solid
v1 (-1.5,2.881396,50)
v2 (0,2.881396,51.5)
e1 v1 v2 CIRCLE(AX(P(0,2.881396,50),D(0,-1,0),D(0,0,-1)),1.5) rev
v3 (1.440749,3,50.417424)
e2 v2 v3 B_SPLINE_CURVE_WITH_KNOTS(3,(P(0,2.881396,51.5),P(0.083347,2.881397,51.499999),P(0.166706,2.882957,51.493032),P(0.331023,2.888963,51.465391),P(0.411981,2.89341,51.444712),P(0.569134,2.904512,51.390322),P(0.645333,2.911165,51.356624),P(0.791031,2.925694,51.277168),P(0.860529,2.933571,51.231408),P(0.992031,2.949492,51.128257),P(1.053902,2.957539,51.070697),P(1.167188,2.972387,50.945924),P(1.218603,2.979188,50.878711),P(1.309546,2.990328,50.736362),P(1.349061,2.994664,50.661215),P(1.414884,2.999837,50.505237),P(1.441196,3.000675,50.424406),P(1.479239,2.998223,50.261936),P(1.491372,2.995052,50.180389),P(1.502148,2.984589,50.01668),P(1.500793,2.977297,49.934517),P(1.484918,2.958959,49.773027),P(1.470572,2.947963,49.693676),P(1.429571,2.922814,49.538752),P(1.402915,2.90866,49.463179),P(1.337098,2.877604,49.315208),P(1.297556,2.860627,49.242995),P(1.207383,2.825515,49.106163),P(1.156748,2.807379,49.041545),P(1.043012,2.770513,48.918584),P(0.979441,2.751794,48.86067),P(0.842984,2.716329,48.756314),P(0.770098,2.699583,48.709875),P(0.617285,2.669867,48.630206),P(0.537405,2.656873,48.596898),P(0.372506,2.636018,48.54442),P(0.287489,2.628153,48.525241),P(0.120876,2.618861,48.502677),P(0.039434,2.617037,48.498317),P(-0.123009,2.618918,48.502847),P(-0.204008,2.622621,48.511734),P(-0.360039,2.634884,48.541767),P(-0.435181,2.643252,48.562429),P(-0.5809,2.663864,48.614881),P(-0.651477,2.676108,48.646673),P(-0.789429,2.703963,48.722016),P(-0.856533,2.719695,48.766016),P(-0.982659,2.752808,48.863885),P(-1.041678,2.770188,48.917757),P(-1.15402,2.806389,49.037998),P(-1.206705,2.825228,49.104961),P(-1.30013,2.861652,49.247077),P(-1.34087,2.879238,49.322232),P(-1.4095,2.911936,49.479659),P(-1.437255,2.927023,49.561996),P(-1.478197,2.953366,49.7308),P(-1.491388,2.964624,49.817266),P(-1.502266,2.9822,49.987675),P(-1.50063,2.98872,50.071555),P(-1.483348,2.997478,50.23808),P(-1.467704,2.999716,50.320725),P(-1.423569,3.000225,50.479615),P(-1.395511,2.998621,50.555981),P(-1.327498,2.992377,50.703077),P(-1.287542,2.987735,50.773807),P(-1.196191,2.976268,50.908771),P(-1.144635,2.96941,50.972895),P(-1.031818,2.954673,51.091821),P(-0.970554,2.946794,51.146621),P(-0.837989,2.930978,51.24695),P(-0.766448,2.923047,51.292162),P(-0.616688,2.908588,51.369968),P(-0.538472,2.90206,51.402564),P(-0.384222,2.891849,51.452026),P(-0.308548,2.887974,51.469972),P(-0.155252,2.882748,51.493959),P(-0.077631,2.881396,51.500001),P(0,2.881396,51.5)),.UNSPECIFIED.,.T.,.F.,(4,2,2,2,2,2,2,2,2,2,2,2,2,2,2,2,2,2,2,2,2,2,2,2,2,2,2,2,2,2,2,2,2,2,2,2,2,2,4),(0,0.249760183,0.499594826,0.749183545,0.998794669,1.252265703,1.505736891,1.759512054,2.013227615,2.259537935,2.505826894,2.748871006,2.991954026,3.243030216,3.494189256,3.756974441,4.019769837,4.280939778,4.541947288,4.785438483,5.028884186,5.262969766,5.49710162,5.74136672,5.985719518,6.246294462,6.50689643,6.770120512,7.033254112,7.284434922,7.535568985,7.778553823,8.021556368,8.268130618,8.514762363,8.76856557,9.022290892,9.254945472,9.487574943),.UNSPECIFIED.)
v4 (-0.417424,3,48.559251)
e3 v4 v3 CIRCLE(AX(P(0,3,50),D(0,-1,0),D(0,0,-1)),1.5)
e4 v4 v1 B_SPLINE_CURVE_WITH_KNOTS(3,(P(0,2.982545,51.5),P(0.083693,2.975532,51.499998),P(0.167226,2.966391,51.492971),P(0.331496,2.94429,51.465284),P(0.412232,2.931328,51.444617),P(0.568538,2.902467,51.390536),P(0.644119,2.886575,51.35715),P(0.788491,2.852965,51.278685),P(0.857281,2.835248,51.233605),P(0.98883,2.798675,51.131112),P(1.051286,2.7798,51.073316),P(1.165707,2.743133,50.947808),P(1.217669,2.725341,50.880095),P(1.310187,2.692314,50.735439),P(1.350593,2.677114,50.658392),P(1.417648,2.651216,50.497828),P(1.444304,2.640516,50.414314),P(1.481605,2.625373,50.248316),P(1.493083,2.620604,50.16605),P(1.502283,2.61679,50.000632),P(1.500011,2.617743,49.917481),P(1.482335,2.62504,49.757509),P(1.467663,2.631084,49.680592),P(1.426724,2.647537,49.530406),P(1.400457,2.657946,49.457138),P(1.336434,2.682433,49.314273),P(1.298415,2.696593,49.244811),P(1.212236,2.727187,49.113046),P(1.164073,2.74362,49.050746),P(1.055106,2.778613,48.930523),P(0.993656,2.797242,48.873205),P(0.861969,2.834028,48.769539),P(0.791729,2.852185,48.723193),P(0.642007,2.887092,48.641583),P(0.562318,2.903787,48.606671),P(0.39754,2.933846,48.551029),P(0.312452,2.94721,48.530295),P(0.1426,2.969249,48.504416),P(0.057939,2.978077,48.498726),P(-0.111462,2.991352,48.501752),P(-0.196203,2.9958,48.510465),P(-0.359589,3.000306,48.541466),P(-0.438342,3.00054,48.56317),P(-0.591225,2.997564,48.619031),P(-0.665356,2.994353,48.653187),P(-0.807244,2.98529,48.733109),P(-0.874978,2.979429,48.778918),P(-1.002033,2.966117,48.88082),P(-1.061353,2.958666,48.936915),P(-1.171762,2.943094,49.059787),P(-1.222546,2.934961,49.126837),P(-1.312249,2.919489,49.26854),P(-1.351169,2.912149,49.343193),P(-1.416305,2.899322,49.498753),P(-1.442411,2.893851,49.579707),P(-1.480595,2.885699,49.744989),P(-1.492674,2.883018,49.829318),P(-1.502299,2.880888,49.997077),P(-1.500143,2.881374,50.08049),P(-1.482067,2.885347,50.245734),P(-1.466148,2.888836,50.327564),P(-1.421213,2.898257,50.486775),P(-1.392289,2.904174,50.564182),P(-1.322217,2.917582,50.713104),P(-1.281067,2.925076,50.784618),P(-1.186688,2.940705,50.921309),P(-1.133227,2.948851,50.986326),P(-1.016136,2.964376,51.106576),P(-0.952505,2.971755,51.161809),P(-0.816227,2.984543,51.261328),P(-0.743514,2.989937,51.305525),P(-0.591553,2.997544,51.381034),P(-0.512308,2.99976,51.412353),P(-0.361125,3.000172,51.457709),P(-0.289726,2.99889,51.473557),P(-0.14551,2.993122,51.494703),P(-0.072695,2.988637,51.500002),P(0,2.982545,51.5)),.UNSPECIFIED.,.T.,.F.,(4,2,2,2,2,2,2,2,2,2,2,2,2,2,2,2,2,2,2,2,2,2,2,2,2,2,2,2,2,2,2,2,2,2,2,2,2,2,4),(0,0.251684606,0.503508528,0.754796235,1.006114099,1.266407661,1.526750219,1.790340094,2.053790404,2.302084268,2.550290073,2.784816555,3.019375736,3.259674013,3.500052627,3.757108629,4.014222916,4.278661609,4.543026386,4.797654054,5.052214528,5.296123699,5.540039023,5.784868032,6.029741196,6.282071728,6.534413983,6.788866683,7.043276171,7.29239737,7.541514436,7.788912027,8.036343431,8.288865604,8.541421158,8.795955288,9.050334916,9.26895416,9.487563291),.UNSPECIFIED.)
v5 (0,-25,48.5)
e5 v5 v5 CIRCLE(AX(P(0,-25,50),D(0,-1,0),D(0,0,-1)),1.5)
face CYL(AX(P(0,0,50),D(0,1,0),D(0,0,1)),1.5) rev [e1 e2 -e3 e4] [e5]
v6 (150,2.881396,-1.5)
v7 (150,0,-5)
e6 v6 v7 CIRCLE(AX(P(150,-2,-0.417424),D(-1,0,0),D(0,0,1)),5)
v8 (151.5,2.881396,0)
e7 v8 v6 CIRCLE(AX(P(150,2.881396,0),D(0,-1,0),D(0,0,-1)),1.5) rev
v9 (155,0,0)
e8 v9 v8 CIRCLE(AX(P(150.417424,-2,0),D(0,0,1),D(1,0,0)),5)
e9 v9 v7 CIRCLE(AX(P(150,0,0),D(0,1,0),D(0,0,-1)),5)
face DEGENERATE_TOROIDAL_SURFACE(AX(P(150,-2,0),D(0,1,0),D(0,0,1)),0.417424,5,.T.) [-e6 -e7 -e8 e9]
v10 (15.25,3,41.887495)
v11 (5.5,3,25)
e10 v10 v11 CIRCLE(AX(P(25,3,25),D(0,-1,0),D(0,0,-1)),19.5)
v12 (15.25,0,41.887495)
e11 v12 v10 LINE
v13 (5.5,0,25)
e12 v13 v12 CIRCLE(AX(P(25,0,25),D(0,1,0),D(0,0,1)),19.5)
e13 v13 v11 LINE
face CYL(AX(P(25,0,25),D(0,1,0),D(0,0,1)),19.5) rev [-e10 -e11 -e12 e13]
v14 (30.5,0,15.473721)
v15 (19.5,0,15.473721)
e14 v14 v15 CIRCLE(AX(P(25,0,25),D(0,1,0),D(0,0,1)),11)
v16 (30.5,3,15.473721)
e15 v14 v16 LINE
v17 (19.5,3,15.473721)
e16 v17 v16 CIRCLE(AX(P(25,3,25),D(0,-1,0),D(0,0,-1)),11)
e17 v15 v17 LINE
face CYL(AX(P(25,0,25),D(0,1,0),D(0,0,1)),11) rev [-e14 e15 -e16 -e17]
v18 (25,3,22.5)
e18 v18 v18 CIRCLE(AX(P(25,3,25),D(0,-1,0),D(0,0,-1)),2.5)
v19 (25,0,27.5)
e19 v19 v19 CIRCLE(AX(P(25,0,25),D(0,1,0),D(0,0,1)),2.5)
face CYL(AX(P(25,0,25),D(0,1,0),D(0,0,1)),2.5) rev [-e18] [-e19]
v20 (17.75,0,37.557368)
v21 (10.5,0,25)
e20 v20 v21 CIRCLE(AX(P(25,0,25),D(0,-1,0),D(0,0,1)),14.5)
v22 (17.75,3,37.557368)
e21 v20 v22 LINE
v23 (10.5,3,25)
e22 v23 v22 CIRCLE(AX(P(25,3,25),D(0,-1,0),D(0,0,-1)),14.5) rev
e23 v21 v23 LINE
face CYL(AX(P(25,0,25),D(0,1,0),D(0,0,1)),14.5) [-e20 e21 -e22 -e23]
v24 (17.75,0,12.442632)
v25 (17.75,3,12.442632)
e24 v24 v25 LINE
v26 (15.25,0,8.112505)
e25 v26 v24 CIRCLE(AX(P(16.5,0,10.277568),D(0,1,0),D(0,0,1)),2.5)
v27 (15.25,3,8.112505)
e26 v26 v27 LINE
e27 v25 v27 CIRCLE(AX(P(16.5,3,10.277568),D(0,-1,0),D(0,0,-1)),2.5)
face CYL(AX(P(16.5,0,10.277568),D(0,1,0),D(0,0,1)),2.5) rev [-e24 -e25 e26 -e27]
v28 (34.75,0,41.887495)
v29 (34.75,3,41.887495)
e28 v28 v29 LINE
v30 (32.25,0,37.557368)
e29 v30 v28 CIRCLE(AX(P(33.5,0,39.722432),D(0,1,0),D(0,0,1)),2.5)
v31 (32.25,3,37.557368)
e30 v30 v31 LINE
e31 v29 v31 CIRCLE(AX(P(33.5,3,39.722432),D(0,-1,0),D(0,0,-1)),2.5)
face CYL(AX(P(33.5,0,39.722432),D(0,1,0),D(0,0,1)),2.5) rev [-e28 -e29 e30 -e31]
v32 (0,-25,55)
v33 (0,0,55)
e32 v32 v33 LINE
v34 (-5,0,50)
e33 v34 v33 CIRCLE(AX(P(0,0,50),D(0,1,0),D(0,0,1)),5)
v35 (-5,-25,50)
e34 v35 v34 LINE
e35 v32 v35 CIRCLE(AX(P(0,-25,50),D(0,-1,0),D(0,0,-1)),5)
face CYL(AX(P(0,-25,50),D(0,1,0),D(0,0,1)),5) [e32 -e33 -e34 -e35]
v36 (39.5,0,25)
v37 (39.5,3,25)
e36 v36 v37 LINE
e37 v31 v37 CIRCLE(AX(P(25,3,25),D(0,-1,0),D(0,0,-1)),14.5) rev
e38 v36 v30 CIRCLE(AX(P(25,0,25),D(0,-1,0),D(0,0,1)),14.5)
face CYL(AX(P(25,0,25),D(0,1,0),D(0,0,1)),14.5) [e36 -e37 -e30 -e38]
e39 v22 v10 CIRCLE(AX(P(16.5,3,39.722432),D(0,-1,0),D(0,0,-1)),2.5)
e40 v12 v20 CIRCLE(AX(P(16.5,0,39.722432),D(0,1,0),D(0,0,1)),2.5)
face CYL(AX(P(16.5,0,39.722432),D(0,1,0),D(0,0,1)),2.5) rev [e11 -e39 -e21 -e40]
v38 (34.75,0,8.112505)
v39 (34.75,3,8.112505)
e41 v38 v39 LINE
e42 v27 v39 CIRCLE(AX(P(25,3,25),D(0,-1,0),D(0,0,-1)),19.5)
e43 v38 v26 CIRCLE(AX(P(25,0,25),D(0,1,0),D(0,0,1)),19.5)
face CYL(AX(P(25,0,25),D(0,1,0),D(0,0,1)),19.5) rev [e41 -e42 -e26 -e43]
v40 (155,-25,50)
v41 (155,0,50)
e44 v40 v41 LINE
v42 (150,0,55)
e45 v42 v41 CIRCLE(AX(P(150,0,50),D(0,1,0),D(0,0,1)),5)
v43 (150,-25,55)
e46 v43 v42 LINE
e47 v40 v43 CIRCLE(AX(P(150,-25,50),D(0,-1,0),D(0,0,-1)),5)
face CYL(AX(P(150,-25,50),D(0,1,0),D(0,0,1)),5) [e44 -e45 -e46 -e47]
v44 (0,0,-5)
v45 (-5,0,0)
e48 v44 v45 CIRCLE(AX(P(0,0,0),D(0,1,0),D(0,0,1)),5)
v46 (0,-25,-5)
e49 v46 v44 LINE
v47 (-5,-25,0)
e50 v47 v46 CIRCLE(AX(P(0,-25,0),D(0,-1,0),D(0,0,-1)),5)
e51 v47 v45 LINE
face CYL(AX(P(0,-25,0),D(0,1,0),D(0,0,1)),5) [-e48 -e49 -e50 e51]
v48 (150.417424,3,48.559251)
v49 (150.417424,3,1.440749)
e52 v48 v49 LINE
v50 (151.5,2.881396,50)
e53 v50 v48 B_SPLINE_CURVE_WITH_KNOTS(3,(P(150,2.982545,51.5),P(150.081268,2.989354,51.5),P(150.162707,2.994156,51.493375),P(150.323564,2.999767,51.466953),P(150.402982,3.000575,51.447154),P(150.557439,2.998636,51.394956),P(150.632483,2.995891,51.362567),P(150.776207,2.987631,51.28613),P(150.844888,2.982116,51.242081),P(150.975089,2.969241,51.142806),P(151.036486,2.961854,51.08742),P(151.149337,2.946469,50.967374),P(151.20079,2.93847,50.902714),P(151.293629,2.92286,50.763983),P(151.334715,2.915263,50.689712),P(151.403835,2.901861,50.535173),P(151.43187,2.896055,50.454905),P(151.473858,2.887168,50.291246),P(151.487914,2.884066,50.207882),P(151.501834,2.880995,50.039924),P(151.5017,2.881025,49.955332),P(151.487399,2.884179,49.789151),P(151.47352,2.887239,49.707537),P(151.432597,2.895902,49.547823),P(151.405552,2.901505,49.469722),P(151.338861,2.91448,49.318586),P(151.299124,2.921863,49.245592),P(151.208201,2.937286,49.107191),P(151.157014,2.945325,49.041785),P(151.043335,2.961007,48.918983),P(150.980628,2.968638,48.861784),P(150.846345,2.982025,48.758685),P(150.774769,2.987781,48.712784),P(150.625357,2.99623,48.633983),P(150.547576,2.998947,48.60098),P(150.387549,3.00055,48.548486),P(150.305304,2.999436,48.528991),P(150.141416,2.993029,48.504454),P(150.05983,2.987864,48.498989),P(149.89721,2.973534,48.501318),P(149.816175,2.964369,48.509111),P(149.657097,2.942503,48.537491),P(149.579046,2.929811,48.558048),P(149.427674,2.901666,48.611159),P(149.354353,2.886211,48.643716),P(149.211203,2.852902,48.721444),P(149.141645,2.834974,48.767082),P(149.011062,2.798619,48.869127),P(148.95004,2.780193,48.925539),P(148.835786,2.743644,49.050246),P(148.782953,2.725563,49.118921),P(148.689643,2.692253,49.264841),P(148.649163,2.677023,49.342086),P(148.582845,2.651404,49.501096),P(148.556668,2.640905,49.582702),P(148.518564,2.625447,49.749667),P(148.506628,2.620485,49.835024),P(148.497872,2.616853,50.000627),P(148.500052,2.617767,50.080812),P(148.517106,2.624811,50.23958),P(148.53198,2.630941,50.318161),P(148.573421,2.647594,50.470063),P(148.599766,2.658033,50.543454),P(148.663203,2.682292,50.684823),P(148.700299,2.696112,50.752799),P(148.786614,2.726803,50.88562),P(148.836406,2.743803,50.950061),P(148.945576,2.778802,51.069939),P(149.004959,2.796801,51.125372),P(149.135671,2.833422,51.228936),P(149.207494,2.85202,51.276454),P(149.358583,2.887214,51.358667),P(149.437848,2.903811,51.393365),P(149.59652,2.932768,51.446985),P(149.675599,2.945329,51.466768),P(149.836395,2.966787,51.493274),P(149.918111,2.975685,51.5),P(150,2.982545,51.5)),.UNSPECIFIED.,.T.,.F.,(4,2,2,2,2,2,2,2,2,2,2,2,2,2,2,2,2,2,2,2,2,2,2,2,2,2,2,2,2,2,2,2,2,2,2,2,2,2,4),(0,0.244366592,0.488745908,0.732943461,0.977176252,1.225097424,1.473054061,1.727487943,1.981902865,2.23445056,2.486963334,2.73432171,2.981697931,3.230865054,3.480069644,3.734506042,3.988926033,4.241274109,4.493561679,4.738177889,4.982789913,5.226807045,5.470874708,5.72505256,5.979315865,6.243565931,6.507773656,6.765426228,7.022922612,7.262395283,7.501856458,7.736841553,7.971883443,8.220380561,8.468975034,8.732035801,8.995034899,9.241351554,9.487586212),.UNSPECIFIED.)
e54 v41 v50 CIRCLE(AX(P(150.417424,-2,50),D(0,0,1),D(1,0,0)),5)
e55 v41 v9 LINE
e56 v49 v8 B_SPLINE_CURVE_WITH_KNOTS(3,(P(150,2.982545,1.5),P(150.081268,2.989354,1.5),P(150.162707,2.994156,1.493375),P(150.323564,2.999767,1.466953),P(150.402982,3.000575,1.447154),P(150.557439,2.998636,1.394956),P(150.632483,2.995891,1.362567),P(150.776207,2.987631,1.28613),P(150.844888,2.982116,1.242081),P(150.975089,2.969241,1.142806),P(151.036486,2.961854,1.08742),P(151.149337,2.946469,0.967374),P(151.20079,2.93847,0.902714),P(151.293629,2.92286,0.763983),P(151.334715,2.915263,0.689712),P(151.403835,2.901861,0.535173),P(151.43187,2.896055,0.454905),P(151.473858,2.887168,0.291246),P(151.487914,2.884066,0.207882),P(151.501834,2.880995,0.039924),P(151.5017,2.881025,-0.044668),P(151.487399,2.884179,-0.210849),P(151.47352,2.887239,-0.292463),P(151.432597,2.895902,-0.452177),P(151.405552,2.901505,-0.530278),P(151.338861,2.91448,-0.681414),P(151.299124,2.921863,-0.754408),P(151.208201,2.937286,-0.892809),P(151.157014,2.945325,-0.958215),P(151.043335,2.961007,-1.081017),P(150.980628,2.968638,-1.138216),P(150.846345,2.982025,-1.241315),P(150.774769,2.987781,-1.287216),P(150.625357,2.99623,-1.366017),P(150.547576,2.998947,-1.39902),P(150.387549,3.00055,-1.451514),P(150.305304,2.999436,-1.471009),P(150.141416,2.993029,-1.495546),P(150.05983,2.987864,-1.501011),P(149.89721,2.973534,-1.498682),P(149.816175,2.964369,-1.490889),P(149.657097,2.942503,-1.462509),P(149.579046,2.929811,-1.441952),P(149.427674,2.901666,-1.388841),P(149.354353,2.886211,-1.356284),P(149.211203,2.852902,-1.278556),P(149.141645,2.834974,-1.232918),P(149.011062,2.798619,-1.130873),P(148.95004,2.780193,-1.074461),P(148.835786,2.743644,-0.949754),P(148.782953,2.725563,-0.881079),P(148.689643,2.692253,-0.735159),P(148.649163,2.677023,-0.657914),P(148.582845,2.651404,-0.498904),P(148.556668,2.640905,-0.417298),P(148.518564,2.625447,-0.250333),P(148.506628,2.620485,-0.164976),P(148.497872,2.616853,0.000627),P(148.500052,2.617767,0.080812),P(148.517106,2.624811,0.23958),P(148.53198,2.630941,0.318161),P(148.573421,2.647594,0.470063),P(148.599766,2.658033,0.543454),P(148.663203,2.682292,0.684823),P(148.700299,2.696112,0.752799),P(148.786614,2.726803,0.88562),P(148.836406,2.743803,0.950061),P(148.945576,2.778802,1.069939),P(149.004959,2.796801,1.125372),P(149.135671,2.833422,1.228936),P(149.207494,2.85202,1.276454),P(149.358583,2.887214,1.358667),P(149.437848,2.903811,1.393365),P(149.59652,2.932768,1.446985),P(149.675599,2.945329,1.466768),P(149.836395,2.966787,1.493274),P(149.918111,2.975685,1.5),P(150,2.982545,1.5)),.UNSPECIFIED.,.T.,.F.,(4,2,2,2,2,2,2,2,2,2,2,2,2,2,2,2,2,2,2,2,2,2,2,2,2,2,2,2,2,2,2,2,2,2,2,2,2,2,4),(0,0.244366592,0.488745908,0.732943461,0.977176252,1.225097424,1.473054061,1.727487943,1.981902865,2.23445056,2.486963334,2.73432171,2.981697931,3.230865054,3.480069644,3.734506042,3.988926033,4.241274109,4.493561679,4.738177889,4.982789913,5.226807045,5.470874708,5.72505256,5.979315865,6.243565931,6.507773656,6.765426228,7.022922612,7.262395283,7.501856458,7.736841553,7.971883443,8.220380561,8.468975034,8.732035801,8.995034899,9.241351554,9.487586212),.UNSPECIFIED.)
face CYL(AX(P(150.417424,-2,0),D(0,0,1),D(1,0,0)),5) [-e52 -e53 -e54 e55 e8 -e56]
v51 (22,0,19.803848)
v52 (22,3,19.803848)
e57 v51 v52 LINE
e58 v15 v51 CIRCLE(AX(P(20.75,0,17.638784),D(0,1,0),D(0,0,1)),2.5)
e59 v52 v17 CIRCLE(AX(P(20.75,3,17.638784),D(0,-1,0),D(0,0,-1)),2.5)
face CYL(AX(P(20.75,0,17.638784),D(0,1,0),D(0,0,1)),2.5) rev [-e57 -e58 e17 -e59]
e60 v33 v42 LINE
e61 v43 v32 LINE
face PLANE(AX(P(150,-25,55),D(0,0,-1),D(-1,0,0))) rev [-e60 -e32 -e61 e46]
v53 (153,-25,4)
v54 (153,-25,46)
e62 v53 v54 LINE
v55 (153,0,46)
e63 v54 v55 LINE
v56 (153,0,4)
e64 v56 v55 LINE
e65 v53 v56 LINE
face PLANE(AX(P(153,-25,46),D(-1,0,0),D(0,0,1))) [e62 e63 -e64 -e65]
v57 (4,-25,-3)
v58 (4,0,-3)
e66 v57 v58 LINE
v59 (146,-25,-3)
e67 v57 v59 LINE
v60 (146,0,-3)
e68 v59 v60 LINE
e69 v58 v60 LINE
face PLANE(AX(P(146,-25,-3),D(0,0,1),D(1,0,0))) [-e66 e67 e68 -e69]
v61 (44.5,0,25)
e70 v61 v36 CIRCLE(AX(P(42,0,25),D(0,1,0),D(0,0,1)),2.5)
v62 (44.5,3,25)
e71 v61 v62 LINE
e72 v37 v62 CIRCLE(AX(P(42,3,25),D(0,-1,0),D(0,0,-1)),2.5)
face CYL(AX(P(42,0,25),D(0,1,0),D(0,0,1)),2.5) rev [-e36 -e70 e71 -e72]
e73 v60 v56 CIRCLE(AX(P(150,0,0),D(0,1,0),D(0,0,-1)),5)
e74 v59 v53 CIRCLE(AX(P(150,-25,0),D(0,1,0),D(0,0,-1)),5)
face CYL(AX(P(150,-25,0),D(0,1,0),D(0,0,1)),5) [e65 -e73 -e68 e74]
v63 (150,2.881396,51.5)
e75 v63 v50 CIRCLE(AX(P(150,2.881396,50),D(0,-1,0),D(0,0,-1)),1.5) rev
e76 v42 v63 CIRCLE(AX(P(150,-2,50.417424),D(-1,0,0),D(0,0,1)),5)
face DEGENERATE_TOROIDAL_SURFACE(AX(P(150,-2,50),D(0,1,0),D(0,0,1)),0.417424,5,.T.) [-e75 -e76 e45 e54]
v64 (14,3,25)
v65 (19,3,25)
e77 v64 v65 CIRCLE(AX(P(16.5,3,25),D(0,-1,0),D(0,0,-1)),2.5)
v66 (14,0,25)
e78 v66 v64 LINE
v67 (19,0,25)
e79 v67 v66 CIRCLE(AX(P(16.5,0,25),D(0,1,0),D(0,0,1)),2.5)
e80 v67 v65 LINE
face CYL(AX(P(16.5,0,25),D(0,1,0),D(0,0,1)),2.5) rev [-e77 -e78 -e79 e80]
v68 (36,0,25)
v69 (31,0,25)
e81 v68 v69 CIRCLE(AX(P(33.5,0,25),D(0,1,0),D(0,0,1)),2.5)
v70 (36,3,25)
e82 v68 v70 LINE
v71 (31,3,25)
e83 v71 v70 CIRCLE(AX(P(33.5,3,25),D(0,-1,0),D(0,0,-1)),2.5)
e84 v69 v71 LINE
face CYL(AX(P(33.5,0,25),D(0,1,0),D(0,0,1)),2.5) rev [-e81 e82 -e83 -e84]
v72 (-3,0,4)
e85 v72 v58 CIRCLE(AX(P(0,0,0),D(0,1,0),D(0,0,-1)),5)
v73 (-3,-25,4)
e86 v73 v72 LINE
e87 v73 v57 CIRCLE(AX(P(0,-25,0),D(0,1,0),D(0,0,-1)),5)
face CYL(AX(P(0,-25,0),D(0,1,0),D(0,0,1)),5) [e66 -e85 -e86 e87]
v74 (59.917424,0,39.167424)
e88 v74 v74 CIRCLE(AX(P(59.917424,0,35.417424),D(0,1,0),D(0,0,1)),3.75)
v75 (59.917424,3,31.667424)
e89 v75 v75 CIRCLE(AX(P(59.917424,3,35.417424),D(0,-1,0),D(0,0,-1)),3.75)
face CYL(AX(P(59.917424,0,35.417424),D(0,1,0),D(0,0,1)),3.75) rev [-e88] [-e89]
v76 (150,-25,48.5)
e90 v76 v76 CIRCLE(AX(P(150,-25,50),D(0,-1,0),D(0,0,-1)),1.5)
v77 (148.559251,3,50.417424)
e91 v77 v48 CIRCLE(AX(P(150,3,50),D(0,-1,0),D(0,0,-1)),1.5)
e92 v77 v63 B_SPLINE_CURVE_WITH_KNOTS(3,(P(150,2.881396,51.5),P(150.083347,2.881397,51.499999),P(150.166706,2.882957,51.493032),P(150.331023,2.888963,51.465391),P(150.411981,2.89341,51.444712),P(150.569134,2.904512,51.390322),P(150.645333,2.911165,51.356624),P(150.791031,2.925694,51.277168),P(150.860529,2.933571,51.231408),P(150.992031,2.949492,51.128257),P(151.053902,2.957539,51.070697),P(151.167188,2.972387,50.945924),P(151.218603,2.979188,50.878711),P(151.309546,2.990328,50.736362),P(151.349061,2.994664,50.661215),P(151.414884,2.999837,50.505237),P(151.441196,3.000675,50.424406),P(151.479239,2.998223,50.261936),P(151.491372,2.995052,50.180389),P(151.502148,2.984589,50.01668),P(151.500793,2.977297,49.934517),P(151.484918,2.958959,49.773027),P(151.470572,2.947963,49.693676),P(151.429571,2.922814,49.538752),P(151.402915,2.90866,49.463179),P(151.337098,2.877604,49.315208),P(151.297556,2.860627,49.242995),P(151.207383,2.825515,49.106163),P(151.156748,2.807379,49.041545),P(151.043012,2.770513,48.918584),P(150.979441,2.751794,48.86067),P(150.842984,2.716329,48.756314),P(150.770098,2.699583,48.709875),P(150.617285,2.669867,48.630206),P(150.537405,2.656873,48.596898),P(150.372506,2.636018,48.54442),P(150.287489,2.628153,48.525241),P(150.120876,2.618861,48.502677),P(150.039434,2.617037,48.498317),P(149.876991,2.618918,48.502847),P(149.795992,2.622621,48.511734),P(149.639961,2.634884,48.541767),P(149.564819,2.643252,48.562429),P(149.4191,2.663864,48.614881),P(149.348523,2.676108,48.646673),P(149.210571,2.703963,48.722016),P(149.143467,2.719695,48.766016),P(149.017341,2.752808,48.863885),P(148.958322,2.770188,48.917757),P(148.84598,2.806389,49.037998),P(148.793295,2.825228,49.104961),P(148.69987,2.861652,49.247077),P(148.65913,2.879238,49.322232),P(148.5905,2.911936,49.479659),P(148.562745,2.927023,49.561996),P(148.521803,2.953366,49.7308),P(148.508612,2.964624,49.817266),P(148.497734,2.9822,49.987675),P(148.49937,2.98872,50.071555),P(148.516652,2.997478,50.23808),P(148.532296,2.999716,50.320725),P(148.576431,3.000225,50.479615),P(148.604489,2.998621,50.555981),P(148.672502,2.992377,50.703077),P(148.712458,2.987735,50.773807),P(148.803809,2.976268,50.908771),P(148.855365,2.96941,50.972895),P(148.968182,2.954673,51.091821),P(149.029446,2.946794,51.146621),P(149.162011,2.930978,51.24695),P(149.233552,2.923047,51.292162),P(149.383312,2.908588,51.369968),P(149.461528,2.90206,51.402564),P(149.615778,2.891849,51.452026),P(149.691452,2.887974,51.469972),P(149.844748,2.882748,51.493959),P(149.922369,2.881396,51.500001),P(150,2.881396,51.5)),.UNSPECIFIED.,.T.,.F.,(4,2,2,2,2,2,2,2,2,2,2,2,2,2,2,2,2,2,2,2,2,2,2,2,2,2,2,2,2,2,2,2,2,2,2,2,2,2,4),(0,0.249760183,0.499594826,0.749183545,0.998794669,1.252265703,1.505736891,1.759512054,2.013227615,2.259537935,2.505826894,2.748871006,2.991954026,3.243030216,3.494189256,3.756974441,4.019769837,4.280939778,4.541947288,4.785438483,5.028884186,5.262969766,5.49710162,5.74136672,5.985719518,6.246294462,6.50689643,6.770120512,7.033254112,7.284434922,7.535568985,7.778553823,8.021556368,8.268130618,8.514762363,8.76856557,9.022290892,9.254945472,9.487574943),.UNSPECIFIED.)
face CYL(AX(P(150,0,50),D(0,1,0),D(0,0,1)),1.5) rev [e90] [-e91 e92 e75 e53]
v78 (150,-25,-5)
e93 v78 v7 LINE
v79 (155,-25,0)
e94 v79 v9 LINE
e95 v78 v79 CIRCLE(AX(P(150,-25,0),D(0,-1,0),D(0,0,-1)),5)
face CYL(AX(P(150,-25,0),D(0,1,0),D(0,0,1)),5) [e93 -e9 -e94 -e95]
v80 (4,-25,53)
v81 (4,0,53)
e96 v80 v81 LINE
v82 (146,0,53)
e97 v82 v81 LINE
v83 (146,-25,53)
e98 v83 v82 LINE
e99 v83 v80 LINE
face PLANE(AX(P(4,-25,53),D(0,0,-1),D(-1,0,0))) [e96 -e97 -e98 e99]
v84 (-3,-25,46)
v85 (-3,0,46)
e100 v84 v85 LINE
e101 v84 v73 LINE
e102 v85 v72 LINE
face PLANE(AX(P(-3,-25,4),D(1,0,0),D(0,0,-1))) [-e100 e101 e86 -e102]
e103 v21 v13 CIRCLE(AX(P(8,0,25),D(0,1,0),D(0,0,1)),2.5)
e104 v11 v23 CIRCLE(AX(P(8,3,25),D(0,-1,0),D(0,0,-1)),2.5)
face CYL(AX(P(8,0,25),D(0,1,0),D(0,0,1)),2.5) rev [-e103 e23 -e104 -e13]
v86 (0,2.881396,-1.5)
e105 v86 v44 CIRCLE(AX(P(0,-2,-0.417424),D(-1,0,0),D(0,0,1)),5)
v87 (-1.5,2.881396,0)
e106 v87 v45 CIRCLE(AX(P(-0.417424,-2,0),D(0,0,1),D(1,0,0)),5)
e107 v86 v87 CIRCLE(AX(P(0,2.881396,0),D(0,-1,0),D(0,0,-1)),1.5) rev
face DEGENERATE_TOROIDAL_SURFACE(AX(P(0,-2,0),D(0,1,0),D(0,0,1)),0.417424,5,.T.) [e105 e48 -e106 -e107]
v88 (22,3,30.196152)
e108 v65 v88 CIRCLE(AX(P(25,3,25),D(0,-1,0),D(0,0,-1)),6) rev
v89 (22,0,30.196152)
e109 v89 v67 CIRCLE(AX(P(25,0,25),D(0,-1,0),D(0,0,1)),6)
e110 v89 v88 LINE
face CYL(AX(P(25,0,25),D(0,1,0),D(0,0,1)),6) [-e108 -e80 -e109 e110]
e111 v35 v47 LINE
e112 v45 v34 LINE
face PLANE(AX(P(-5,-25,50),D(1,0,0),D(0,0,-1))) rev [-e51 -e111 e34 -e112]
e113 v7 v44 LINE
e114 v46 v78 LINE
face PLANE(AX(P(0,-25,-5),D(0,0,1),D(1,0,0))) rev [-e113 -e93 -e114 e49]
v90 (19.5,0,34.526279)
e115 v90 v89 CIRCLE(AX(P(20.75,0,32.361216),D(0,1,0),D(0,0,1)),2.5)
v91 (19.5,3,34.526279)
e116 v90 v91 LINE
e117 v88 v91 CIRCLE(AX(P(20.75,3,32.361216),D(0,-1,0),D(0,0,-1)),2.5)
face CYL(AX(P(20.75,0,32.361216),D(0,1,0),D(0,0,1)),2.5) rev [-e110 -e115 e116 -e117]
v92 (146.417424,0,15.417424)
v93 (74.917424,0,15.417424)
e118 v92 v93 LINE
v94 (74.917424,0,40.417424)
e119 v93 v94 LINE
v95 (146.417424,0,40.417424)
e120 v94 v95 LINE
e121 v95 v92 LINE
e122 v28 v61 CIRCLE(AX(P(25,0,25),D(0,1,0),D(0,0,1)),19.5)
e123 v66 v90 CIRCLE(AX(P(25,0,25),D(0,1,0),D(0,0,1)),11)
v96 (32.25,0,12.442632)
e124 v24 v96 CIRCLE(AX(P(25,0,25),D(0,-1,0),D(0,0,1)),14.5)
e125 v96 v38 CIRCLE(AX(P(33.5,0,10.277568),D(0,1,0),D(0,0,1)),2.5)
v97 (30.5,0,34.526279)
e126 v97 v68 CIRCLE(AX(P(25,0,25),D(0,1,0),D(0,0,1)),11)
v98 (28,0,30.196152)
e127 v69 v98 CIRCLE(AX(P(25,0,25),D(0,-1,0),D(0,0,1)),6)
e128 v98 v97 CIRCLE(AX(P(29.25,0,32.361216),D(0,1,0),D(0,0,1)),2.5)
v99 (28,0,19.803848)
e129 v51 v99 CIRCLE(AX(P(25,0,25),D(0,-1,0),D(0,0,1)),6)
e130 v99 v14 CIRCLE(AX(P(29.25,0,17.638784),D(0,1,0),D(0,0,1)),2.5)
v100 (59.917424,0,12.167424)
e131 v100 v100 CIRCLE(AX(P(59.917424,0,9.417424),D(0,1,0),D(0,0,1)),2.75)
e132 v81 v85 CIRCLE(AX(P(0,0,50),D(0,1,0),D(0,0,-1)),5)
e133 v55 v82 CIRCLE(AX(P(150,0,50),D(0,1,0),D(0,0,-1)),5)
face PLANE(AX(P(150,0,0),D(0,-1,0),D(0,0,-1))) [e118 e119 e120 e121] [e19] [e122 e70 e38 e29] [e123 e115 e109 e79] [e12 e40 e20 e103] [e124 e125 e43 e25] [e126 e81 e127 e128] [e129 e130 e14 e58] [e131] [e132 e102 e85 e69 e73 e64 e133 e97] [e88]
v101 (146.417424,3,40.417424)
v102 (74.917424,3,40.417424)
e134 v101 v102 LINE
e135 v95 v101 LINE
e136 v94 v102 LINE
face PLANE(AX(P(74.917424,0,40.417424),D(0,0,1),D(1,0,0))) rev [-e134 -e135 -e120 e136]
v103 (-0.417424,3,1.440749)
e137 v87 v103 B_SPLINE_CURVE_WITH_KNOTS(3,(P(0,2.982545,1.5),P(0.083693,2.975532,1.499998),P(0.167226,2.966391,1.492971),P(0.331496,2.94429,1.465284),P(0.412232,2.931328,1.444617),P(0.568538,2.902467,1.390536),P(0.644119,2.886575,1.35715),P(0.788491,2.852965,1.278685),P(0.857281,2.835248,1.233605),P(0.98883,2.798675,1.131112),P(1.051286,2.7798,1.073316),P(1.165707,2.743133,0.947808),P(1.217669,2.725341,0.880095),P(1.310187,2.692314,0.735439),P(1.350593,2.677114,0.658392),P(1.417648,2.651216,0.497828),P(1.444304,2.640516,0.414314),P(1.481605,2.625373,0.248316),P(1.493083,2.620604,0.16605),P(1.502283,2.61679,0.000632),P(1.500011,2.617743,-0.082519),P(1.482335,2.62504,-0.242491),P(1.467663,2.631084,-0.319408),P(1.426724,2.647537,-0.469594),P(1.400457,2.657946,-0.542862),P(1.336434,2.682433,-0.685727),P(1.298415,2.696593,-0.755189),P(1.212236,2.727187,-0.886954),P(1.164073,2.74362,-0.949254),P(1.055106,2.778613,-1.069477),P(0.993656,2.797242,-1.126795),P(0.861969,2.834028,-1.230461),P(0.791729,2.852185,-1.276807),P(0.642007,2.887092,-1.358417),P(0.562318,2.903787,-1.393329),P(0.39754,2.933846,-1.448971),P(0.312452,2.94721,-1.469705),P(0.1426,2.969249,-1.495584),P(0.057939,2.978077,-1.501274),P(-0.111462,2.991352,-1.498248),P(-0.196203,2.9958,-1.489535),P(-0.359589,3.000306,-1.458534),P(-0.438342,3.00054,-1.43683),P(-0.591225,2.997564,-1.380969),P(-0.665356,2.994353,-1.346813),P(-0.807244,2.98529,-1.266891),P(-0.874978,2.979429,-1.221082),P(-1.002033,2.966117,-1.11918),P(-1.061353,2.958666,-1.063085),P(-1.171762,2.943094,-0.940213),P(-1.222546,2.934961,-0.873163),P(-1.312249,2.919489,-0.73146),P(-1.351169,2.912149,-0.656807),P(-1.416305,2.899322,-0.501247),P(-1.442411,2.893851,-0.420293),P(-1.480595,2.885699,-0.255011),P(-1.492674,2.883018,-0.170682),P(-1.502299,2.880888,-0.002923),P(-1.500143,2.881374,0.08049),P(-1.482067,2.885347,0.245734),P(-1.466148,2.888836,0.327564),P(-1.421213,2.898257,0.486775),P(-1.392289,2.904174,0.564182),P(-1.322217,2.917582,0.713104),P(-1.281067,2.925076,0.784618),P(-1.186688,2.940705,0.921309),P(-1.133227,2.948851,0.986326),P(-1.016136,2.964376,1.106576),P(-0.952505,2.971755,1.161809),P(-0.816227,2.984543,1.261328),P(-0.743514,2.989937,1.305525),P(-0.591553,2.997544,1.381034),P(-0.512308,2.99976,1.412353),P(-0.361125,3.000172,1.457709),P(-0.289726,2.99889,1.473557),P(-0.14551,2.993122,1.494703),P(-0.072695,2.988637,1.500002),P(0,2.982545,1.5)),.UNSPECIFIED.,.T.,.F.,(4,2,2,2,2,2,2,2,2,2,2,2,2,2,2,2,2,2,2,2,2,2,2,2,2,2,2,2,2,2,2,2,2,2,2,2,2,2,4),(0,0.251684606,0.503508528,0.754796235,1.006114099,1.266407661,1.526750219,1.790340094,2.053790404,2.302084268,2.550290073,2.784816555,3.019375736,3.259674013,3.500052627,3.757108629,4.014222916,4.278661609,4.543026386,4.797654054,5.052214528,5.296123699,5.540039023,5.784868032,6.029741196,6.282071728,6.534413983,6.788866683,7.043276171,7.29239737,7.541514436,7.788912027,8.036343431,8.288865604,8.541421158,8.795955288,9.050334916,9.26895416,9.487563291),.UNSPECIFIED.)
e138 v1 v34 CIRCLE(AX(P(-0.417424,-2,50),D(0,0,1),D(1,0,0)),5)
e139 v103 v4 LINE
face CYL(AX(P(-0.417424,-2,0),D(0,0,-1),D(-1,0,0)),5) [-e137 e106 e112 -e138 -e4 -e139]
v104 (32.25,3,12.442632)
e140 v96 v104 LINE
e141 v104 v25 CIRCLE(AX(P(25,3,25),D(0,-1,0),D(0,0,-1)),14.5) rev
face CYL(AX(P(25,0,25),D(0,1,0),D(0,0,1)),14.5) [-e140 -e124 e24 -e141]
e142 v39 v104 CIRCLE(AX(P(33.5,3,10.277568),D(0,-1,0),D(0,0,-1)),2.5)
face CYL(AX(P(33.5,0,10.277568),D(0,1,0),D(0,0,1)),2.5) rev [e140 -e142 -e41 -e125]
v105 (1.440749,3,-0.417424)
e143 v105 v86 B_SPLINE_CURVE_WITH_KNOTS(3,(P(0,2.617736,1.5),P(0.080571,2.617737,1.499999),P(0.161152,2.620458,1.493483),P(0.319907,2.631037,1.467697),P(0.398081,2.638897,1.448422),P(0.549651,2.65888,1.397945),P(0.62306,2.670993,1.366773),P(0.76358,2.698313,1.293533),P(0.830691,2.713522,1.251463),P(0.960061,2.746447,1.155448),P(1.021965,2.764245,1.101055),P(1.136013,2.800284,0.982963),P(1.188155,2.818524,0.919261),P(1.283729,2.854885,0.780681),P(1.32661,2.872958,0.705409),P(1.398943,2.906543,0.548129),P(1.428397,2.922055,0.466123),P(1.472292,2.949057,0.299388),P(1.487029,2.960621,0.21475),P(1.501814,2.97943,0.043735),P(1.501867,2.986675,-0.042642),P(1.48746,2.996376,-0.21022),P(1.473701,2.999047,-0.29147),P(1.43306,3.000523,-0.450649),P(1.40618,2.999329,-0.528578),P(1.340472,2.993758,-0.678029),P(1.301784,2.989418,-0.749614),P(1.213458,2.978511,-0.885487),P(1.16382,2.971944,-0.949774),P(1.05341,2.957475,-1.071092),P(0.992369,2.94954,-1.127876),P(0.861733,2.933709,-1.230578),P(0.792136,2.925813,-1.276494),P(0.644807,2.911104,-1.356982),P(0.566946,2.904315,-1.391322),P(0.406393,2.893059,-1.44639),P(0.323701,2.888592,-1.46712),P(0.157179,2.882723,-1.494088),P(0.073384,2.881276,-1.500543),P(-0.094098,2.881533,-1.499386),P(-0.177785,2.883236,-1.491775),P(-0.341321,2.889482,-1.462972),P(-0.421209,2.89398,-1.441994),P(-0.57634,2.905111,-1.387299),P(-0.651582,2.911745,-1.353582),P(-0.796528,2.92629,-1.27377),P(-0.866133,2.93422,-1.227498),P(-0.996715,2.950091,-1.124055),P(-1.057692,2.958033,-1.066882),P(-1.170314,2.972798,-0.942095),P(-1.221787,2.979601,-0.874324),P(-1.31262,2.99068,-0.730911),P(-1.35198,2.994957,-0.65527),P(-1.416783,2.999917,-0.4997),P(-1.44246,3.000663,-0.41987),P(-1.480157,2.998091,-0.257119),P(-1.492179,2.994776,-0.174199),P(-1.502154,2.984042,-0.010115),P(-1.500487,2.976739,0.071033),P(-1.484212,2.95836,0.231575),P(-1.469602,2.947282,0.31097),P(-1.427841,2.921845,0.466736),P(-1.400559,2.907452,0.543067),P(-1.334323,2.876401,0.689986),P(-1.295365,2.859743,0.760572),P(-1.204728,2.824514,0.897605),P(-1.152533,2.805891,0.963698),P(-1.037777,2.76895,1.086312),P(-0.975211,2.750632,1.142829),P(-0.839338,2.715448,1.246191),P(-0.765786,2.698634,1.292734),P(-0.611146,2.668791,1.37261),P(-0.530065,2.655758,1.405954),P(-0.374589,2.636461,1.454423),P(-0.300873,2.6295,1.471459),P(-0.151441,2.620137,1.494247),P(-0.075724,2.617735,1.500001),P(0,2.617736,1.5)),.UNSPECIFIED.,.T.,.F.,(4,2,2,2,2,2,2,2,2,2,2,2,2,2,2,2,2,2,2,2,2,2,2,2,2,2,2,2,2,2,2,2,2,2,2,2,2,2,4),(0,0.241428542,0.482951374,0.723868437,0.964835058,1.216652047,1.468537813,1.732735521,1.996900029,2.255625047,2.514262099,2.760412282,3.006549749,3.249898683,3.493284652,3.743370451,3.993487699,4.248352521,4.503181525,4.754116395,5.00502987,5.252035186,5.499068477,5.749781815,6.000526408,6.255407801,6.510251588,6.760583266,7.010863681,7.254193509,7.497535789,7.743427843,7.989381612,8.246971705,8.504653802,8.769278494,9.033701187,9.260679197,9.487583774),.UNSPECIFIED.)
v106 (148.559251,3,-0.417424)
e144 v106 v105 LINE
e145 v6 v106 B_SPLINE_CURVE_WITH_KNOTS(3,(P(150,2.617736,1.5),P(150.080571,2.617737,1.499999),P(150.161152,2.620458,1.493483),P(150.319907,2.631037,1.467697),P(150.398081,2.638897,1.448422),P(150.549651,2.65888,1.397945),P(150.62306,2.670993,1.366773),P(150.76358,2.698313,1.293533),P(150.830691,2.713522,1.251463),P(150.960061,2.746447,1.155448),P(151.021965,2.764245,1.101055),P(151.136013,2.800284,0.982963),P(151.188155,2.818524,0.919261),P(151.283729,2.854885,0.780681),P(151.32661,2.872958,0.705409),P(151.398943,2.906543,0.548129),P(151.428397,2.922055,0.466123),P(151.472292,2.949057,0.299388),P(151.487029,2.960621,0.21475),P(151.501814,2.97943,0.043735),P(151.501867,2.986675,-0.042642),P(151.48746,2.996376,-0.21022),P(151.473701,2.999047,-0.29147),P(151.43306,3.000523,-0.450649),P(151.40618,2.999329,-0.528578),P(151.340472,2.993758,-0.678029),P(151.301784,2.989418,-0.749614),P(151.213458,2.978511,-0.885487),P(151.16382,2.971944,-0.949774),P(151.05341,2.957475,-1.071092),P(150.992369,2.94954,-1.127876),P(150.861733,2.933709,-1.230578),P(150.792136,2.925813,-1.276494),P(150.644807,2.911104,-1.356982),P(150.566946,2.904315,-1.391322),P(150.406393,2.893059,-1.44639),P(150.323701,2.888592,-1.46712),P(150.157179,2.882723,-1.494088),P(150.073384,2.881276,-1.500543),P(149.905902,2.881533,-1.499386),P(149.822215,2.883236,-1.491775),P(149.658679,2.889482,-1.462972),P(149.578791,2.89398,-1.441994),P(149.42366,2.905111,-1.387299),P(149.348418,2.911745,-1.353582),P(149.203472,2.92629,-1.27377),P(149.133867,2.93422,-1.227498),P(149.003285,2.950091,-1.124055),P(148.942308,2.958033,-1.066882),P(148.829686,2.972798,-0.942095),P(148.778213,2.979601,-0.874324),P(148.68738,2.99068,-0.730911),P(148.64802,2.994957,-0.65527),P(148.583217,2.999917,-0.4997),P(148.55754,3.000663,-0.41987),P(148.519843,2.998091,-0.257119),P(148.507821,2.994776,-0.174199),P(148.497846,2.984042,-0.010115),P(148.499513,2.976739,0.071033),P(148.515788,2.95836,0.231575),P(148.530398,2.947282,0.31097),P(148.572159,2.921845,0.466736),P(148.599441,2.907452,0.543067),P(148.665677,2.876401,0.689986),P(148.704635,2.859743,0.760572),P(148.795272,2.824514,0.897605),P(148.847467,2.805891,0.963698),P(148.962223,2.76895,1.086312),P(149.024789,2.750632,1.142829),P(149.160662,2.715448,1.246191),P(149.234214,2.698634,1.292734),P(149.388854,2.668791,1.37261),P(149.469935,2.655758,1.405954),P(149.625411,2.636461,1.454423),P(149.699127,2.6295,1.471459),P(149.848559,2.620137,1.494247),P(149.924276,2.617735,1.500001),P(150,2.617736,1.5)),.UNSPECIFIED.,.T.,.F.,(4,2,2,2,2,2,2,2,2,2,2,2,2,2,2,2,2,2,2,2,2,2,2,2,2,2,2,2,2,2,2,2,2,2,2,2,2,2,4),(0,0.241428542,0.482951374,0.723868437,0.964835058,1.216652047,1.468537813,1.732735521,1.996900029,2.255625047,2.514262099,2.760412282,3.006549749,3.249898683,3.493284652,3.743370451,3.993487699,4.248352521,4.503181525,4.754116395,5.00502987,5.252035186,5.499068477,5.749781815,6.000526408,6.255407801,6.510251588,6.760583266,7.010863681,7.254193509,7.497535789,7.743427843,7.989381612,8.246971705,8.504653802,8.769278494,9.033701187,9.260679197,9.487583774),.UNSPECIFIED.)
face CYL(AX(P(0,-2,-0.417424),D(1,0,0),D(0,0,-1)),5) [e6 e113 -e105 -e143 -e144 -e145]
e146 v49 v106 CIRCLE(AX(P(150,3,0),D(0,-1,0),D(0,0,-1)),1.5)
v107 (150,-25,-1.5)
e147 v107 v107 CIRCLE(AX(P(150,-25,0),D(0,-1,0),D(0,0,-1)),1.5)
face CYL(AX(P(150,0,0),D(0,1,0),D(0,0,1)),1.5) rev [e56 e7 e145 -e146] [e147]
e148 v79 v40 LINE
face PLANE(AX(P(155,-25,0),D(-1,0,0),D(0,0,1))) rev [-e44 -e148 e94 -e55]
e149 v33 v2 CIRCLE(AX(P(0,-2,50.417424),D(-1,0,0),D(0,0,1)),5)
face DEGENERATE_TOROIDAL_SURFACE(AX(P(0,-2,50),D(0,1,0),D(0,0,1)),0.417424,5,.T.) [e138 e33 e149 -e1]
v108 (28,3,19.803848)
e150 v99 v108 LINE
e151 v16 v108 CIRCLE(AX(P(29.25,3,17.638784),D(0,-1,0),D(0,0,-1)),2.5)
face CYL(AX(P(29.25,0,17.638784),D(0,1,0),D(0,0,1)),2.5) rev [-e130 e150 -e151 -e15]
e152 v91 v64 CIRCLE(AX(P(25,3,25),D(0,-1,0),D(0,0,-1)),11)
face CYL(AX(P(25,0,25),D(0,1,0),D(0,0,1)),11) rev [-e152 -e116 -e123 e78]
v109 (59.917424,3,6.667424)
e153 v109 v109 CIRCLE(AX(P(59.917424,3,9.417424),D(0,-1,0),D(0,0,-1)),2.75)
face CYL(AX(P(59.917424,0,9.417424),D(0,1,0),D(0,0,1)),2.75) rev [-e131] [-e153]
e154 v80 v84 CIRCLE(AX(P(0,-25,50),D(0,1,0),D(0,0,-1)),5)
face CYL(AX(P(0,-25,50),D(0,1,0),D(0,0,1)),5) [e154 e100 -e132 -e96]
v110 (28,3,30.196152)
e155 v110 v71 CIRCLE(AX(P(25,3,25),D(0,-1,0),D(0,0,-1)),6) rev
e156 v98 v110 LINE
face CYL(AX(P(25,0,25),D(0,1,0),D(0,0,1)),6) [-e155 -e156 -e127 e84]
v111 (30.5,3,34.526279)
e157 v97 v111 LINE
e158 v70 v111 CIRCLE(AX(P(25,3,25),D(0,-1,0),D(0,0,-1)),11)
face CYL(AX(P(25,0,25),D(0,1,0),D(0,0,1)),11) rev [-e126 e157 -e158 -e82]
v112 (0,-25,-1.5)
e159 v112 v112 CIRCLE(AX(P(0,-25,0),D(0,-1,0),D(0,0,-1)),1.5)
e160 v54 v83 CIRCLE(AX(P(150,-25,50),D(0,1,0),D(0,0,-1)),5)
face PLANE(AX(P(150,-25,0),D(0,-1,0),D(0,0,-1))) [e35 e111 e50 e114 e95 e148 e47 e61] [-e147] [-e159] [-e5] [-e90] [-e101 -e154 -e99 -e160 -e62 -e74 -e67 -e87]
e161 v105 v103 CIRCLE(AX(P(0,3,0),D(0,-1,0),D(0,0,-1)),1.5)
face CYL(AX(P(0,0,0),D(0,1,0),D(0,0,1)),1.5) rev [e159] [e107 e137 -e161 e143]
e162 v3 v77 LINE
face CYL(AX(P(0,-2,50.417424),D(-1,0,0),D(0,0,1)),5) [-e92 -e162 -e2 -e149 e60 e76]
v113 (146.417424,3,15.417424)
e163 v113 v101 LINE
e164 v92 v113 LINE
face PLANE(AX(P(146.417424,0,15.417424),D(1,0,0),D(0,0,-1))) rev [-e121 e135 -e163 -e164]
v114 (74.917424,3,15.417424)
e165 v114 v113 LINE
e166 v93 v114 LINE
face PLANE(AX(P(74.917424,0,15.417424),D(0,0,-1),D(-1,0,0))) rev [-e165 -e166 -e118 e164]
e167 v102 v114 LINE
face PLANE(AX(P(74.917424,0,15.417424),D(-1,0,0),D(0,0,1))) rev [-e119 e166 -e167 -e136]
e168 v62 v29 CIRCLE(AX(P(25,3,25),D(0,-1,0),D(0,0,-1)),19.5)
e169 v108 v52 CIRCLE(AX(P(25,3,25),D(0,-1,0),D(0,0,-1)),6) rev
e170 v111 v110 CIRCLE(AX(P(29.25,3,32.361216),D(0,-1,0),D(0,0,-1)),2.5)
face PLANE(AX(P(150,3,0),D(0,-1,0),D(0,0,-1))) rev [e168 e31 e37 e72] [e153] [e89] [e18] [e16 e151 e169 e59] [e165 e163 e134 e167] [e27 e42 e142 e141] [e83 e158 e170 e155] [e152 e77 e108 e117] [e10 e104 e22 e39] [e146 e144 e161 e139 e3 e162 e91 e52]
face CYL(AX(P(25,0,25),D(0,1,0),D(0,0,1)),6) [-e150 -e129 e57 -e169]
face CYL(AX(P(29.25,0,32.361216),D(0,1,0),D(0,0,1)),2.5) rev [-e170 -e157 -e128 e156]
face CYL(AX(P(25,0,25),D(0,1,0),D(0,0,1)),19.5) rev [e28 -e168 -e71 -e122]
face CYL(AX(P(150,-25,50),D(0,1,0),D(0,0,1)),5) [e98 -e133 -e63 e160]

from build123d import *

# Parameters (mm, degrees)
BOSS_EXTRUDE1_DEPTH     = 3
FILLET1_R               = 5
CUT_EXTRUDE1_DEPTH      = 165.496200564
CUT_EXTRUDE1_DEPTH_BACK = 165.496200564
SKETCH2_R               = 1.5
CUT_EXTRUDE2_DEPTH      = 165.496200694
CUT_EXTRUDE2_DEPTH_BACK = 165.496200694
SKETCH3_R               = 2.5
CUT_EXTRUDE3_DEPTH      = 165.496200694
CUT_EXTRUDE3_DEPTH_BACK = 165.496200694
SKETCH4_R               = 3.75
SKETCH4_R_2             = 2.75
SKETCH4_W               = 71.5
SKETCH4_H               = 25
SKETCH5_R               = 1.5
BOSS_EXTRUDE2_DEPTH     = 25


with BuildPart() as part:
    # Sketch1 → Boss-Extrude1 (new body)
    with BuildSketch(Plane(origin=(0, 0, 0), x_dir=(1, 0, 0), z_dir=(0, 1, 0))):
        with BuildLine():
            Line((0, 5), (150, 5))
            ThreePointArc((150, 5), (153.535533906, 3.535533906), (155, 0))
            Line((155, 0), (155, -50))
            ThreePointArc((155, -50), (153.535533906, -53.535533906), (150, -55))
            Line((150, -55), (0, -55))
            ThreePointArc((0, -55), (-3.535533906, -53.535533906), (-5, -50))
            Line((-5, -50), (-5, 0))
            ThreePointArc((-5, 0), (-3.535533906, 3.535533906), (0, 5))
        make_face()
    extrude(amount=BOSS_EXTRUDE1_DEPTH)

    # Fillet1
    # the kernel refuses this fillet: 5 mm, written as the material it takes off along each edge
    with BuildSketch(Plane(origin=(0, 3, 50), x_dir=(0, 0, 1), z_dir=(1, 0, 0))) as fillet1_piece_1:
        with BuildLine():
            CenterArc((0.417424305, 5), FILLET1_R, 270, 66.421821522)
            Line((0.417424305, 0), (0.417424305, -0.1))
            Line((0.417424305, -0.1), (5, -0.1))
            Line((5, -0.1), (5.1, 0))
            ThreePointArc((5.1, 0), (5.1, 1.5), (5.091651514, 2.96))
            Line((5.091651514, 2.96), (5, 3))
        make_face()
    revolve(axis=Axis((0, 3, 50), (0, -1, 0)), revolution_arc=90, mode=Mode.SUBTRACT)
    with BuildSketch(Plane(origin=(-5, 3, 50), x_dir=(0, -1, 0), z_dir=(0, 0, -1)), Plane(origin=(155, 3, 0), x_dir=(0, -1, 0), z_dir=(0, 0, 1))) as fillet1_piece_2:
        with BuildLine():
            CenterArc((5, -4.582575695), FILLET1_R, 113.578178478, 66.421821522)
            Line((0, -4.582575695), (-0.1, -4.582575695))
            Line((-0.1, -4.582575695), (-0.1, 0))
            Line((-0.1, 0), (0, 0.1))
            ThreePointArc((0, 0.1), (1.5, 0.1), (2.96, 0.091651514))
            Line((2.96, 0.091651514), (3, 0))
        make_face()
    extrude(amount=50, mode=Mode.SUBTRACT)
    with BuildSketch(Plane(origin=(0, 3, 0), x_dir=(-1, 0, 0), z_dir=(0, 0, 1))) as fillet1_piece_3:
        with BuildLine():
            CenterArc((0.417424305, 5), FILLET1_R, 270, 66.421821522)
            Line((0.417424305, 0), (0.417424305, -0.1))
            Line((0.417424305, -0.1), (5, -0.1))
            Line((5, -0.1), (5.1, 0))
            ThreePointArc((5.1, 0), (5.1, 1.5), (5.091651514, 2.96))
            Line((5.091651514, 2.96), (5, 3))
        make_face()
    revolve(axis=Axis((0, 3, 0), (0, -1, 0)), revolution_arc=90, mode=Mode.SUBTRACT)
    with BuildSketch(Plane(origin=(0, 3, -5), x_dir=(0, -1, 0), z_dir=(1, 0, 0)), Plane(origin=(150, 3, 55), x_dir=(0, -1, 0), z_dir=(-1, 0, 0))) as fillet1_piece_4:
        with BuildLine():
            CenterArc((5, -4.582575695), FILLET1_R, 113.578178478, 66.421821522)
            Line((0, -4.582575695), (-0.1, -4.582575695))
            Line((-0.1, -4.582575695), (-0.1, 0))
            Line((-0.1, 0), (0, 0.1))
            ThreePointArc((0, 0.1), (1.5, 0.1), (2.96, 0.091651514))
            Line((2.96, 0.091651514), (3, 0))
        make_face()
    extrude(amount=150, mode=Mode.SUBTRACT)
    with BuildSketch(Plane(origin=(150, 3, 0), x_dir=(0, 0, -1), z_dir=(-1, 0, 0))) as fillet1_piece_5:
        with BuildLine():
            CenterArc((0.417424305, 5), FILLET1_R, 270, 66.421821522)
            Line((0.417424305, 0), (0.417424305, -0.1))
            Line((0.417424305, -0.1), (5, -0.1))
            Line((5, -0.1), (5.1, 0))
            ThreePointArc((5.1, 0), (5.1, 1.5), (5.091651514, 2.96))
            Line((5.091651514, 2.96), (5, 3))
        make_face()
    revolve(axis=Axis((150, 3, 0), (0, -1, 0)), revolution_arc=90, mode=Mode.SUBTRACT)
    with BuildSketch(Plane(origin=(150, 3, 50), x_dir=(1, 0, 0), z_dir=(0, 0, -1))) as fillet1_piece_6:
        with BuildLine():
            CenterArc((0.417424305, 5), FILLET1_R, 270, 66.421821522)
            Line((0.417424305, 0), (0.417424305, -0.1))
            Line((0.417424305, -0.1), (5, -0.1))
            Line((5, -0.1), (5.1, 0))
            ThreePointArc((5.1, 0), (5.1, 1.5), (5.091651514, 2.96))
            Line((5.091651514, 2.96), (5, 3))
        make_face()
    revolve(axis=Axis((150, 3, 50), (0, -1, 0)), revolution_arc=90, mode=Mode.SUBTRACT)

    # Sketch2 → Cut-Extrude1 (cut, two sides: drawn at the far end of the back side and taken through both)
    with BuildSketch(Plane(origin=(0, 3, 0), x_dir=(1, 0, 0), z_dir=(0, 1, 0)).offset(-CUT_EXTRUDE1_DEPTH_BACK)):
        with Locations(Location((0, -50, 0), (0, 0, 270))):
            Circle(SKETCH2_R)
        with Locations(Location((0, 0, 0), (0, 0, 270))):
            Circle(SKETCH2_R)
        with Locations(Location((150, -50, 0), (0, 0, 270))):
            Circle(SKETCH2_R)
        with Locations(Location((150, 0, 0), (0, 0, 270))):
            Circle(SKETCH2_R)
    extrude(amount=CUT_EXTRUDE1_DEPTH + CUT_EXTRUDE1_DEPTH_BACK, mode=Mode.SUBTRACT)

    # Sketch3 → Cut-Extrude2 (cut, two sides: drawn at the far end of the back side and taken through both)
    with BuildSketch(Plane(origin=(0, 3, 0), x_dir=(1, 0, 0), z_dir=(0, 1, 0)).offset(-CUT_EXTRUDE2_DEPTH_BACK)):
        with Locations(Location((25, -25, 0), (0, 0, 270))):
            Circle(SKETCH3_R)
        with BuildLine():
            ThreePointArc((30.5, -15.473720558), (25, -14), (19.5, -15.473720558))
            ThreePointArc((19.5, -15.473720558), (18.584936491, -18.888784068), (22, -19.803847577))
            ThreePointArc((22, -19.803847577), (25, -19), (28, -19.803847577))
            ThreePointArc((28, -19.803847577), (31.415063509, -18.888784068), (30.5, -15.473720558))
        make_face()
        with BuildLine():
            ThreePointArc((30.5, -34.526279442), (34.526279442, -30.5), (36, -25))
            ThreePointArc((36, -25), (33.5, -22.5), (31, -25))
            ThreePointArc((31, -25), (30.196152423, -28), (28, -30.196152423))
            ThreePointArc((28, -30.196152423), (27.084936491, -33.611215932), (30.5, -34.526279442))
        make_face()
        with BuildLine():
            ThreePointArc((14, -25), (15.473720558, -30.5), (19.5, -34.526279442))
            ThreePointArc((19.5, -34.526279442), (22.915063509, -33.611215932), (22, -30.196152423))
            ThreePointArc((22, -30.196152423), (19.803847577, -28), (19, -25))
            ThreePointArc((19, -25), (16.5, -22.5), (14, -25))
        make_face()
        with BuildLine():
            ThreePointArc((34.75, -8.112504626), (25, -5.5), (15.25, -8.112504626))
            ThreePointArc((15.25, -8.112504626), (14.334936491, -11.527568136), (17.75, -12.442631645))
            ThreePointArc((17.75, -12.442631645), (25, -10.5), (32.25, -12.442631645))
            ThreePointArc((32.25, -12.442631645), (35.665063509, -11.527568136), (34.75, -8.112504626))
        make_face()
        with BuildLine():
            ThreePointArc((34.75, -41.887495374), (41.887495374, -34.75), (44.5, -25))
            ThreePointArc((44.5, -25), (42, -22.5), (39.5, -25))
            ThreePointArc((39.5, -25), (37.557368355, -32.25), (32.25, -37.557368355))
            ThreePointArc((32.25, -37.557368355), (31.334936491, -40.972431864), (34.75, -41.887495374))
        make_face()
        with BuildLine():
            ThreePointArc((5.5, -25), (8.112504626, -34.75), (15.25, -41.887495374))
            ThreePointArc((15.25, -41.887495374), (18.665063509, -40.972431864), (17.75, -37.557368355))
            ThreePointArc((17.75, -37.557368355), (12.442631645, -32.25), (10.5, -25))
            ThreePointArc((10.5, -25), (8, -22.5), (5.5, -25))
        make_face()
    extrude(amount=CUT_EXTRUDE2_DEPTH + CUT_EXTRUDE2_DEPTH_BACK, mode=Mode.SUBTRACT)

    # Sketch4 → Cut-Extrude3 (cut, two sides: drawn at the far end of the back side and taken through both)
    with BuildSketch(Plane(origin=(0, 3, 0), x_dir=(1, 0, 0), z_dir=(0, 1, 0)).offset(-CUT_EXTRUDE3_DEPTH_BACK)):
        with Locations(Location((59.917424305, -35.417424305, 0), (0, 0, 270))):
            Circle(SKETCH4_R)
        with Locations(Location((59.917424305, -9.417424305, 0), (0, 0, 270))):
            Circle(SKETCH4_R_2)
        with Locations((110.667424305, -27.917424305)):
            Rectangle(SKETCH4_W, SKETCH4_H)
    extrude(amount=CUT_EXTRUDE3_DEPTH + CUT_EXTRUDE3_DEPTH_BACK, mode=Mode.SUBTRACT)

    # Sketch5 → Boss-Extrude2 (add)
    with BuildSketch(Plane.XZ):
        with BuildLine():
            Line((155, 0), (155, 50))
            ThreePointArc((155, 50), (153.535533906, 53.535533906), (150, 55))
            Line((150, 55), (0, 55))
            ThreePointArc((0, 55), (-3.535533906, 53.535533906), (-5, 50))
            Line((-5, 50), (-5, 0))
            ThreePointArc((-5, 0), (-3.535533906, -3.535533906), (0, -5))
            Line((0, -5), (150, -5))
            ThreePointArc((150, -5), (153.535533906, -3.535533906), (155, 0))
        make_face()
        with Locations(Location((0, 50, 0), (0, 0, 90))):
            Circle(SKETCH5_R, mode=Mode.SUBTRACT)
        with Locations(Location((0, 0, 0), (0, 0, 270))):
            Circle(SKETCH5_R, mode=Mode.SUBTRACT)
        with Locations(Location((150, 0, 0), (0, 0, 270))):
            Circle(SKETCH5_R, mode=Mode.SUBTRACT)
        with Locations(Location((150, 50, 0), (0, 0, 90))):
            Circle(SKETCH5_R, mode=Mode.SUBTRACT)
        with BuildLine():
            Line((4, 53), (146, 53))
            ThreePointArc((146, 53), (146.464466094, 46.464466094), (153, 46))
            Line((153, 46), (153, 4))
            ThreePointArc((153, 4), (146.464466094, 3.535533906), (146, -3))
            Line((146, -3), (4, -3))
            ThreePointArc((4, -3), (3.535533906, 3.535533906), (-3, 4))
            Line((-3, 4), (-3, 46))
            ThreePointArc((-3, 46), (3.535533906, 46.464466094), (4, 53))
        make_face(mode=Mode.SUBTRACT)
    extrude(amount=BOSS_EXTRUDE2_DEPTH)


solid = part.part
